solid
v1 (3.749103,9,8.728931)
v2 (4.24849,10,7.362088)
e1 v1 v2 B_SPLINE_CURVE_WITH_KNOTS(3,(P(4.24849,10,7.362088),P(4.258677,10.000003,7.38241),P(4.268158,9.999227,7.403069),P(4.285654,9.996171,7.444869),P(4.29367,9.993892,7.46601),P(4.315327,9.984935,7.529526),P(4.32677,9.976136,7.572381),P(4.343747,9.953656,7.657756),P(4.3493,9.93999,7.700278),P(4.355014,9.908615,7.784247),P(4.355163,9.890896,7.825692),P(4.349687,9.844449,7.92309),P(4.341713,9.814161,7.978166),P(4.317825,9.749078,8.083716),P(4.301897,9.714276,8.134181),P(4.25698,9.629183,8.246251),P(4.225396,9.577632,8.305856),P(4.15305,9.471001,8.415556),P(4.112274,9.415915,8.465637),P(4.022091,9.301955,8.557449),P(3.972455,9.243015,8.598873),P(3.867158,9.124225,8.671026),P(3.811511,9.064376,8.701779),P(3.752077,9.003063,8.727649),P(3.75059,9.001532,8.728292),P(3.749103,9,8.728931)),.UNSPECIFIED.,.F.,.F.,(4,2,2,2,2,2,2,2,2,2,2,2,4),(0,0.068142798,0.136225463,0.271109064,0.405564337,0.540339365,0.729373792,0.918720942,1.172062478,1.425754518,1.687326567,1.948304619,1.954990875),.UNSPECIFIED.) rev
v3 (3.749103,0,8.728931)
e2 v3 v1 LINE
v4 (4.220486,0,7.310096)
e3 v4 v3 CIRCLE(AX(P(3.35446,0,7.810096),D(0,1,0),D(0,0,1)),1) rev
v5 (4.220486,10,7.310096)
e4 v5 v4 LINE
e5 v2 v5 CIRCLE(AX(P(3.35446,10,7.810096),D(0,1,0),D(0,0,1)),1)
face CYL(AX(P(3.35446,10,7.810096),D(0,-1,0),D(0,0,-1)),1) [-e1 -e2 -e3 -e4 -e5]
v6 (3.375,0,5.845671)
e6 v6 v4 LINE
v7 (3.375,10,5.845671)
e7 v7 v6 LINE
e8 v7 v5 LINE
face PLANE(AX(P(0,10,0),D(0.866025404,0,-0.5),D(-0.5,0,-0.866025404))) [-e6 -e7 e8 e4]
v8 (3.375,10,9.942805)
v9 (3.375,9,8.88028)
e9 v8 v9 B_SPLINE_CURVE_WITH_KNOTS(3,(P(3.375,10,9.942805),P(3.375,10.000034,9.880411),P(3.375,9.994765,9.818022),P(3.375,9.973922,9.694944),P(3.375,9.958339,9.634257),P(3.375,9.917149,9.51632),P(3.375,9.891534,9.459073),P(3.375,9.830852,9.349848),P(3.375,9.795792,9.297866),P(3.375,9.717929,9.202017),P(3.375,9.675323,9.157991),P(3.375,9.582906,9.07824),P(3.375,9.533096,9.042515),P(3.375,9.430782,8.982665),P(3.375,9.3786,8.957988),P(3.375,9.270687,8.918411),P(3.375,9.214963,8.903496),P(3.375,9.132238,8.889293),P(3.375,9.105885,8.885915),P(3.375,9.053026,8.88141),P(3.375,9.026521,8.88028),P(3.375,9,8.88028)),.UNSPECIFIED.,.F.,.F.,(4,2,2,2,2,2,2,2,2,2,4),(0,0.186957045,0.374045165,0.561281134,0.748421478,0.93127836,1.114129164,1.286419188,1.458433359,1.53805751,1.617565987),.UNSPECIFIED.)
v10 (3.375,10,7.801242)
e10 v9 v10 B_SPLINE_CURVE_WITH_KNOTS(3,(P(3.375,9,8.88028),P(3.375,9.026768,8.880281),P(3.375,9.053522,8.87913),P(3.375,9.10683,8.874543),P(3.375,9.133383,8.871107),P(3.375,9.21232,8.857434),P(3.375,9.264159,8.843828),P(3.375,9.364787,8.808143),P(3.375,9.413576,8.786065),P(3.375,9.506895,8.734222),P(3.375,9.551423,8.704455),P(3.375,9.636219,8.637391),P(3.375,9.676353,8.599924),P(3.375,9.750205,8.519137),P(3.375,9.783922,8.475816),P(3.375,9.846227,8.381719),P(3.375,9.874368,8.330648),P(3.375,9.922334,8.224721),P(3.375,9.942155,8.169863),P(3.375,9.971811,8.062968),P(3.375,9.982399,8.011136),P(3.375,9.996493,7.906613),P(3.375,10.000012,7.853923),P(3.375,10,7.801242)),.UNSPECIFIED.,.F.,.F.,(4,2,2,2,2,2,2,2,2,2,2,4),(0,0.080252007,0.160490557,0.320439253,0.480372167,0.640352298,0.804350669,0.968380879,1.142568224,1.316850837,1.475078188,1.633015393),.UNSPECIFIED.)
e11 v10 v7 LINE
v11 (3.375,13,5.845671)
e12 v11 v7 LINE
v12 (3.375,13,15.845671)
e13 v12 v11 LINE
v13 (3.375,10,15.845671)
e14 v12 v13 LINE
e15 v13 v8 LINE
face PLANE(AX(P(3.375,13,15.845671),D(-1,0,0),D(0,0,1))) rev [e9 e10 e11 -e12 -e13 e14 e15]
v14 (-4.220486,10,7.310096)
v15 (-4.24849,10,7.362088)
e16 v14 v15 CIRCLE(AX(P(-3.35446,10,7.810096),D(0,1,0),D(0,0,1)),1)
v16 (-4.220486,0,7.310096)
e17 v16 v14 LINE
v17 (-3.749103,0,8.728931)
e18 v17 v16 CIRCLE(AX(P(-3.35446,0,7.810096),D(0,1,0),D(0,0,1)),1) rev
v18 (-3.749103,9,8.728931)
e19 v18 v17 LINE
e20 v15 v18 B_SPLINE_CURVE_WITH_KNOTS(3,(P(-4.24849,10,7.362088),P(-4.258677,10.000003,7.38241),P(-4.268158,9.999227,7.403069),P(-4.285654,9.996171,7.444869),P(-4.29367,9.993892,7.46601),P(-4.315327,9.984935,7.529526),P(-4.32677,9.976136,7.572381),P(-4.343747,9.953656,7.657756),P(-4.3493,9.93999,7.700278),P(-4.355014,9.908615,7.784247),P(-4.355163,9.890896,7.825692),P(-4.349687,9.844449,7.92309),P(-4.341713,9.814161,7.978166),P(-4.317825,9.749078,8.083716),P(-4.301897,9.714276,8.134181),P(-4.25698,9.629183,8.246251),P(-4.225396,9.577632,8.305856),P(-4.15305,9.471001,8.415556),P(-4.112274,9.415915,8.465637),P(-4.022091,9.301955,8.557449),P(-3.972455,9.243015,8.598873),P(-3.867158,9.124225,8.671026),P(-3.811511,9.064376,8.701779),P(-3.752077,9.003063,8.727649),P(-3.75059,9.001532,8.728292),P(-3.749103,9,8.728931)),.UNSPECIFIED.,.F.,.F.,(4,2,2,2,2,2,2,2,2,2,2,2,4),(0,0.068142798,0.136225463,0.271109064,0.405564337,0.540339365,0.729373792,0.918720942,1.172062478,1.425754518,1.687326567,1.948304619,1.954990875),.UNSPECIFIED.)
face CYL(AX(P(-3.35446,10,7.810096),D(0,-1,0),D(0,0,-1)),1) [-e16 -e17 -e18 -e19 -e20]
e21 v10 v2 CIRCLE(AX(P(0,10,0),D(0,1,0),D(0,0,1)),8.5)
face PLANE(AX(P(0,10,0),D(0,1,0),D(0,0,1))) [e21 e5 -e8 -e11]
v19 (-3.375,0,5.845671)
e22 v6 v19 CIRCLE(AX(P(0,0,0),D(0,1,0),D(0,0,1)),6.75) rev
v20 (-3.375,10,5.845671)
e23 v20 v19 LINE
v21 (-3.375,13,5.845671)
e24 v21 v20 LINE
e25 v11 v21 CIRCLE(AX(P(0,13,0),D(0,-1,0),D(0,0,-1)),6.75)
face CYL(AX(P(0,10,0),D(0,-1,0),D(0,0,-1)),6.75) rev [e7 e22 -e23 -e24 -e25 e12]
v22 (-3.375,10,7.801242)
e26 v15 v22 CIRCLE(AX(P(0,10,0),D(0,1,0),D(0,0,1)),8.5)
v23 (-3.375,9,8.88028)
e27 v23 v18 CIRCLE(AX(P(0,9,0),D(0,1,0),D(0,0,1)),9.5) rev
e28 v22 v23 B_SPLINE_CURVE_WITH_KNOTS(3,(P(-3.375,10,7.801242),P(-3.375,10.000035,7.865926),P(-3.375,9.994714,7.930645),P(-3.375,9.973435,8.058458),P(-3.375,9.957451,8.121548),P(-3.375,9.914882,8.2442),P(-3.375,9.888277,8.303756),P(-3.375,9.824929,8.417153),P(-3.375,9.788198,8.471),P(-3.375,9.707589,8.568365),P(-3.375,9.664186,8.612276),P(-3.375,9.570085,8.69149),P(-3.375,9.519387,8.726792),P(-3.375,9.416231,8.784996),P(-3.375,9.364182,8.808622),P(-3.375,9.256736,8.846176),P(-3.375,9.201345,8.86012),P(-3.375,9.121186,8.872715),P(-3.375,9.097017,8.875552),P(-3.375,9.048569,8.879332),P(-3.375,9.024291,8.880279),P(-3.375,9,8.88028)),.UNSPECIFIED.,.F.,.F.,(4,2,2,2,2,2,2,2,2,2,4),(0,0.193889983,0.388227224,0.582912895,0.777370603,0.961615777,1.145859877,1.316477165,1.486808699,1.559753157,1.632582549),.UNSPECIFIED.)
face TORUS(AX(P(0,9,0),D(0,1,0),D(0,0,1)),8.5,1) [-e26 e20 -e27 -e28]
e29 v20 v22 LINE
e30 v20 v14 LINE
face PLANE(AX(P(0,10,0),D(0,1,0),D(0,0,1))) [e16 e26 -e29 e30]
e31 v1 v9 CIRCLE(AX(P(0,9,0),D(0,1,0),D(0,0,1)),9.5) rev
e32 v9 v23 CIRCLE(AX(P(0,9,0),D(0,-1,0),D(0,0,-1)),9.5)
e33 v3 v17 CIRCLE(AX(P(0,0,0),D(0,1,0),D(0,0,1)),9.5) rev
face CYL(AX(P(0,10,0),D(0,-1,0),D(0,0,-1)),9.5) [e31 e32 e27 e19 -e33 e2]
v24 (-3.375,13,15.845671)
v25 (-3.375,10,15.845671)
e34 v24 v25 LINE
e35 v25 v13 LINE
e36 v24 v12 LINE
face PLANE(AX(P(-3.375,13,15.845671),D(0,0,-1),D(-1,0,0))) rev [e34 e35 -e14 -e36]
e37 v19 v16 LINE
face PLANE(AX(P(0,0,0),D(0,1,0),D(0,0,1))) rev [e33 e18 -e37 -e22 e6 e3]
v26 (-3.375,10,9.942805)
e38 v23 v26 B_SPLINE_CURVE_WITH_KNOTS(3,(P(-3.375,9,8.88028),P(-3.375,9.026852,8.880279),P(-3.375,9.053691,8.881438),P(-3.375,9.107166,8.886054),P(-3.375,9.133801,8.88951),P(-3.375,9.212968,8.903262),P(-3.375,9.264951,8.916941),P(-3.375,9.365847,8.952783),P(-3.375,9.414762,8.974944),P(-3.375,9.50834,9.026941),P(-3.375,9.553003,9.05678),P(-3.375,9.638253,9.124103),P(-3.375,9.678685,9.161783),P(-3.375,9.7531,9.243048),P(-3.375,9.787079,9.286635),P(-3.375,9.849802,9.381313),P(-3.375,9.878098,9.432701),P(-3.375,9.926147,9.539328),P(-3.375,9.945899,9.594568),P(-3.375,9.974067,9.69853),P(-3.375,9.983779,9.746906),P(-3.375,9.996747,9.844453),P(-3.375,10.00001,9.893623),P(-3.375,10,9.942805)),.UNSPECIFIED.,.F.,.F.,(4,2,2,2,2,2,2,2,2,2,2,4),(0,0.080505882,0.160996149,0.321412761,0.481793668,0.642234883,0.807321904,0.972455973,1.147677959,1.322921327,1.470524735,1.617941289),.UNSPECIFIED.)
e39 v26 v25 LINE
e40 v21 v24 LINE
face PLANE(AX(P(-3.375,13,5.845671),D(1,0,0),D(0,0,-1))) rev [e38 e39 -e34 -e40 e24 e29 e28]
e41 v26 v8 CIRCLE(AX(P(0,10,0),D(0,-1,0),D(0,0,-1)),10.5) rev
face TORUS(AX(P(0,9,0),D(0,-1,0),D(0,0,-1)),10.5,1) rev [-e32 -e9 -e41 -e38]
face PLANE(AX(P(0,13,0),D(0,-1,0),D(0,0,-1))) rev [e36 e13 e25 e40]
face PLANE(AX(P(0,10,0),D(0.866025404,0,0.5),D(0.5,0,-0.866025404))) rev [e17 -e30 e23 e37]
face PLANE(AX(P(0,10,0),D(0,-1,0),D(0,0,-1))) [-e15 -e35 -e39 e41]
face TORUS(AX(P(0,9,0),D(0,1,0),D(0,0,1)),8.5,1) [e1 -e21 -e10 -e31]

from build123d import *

# Parameters (mm, degrees)
BOSS_EXTRUDE1_DEPTH = 10
BOSS_EXTRUDE2_DEPTH = 3
FILLET1_R           = 1
FILLET2_R           = 1
FILLET3_R           = 1
FILLET4_R           = 1


with BuildPart() as part:
    # Sketch1 → Boss-Extrude1 (new body)
    with BuildSketch(Plane(origin=(0, 0, 0), x_dir=(1, 0, 0), z_dir=(0, 1, 0))):
        with BuildLine():
            ThreePointArc((4.75, -8.227241336), (0, -9.5), (-4.75, -8.227241336))
            Line((-4.75, -8.227241336), (-3.375, -5.845671476))
            ThreePointArc((-3.375, -5.845671476), (0, -6.75), (3.375, -5.845671476))
            Line((3.375, -5.845671476), (4.75, -8.227241336))
        make_face()
    extrude(amount=BOSS_EXTRUDE1_DEPTH)

    # Sketch2 → Boss-Extrude2 (add)
    with BuildSketch(Plane(origin=(0, 10, 0), x_dir=(1, 0, 0), z_dir=(0, 1, 0))):
        with BuildLine():
            Line((-3.375, -5.845671476), (-3.375, -15.845671476))
            Line((-3.375, -15.845671476), (3.375, -15.845671476))
            Line((3.375, -15.845671476), (3.375, -5.845671476))
            ThreePointArc((3.375, -5.845671476), (0, -6.75), (-3.375, -5.845671476))
        make_face()
    extrude(amount=BOSS_EXTRUDE2_DEPTH)

    # Fillet1
    fillet1_edges = [part.edges().sort_by_distance(p)[0] for p in [
        (0, 10, 9.5),
    ]]
    fillet(fillet1_edges, radius=FILLET1_R)

    # Fillet2
    fillet2_edges = [part.edges().sort_by_distance(p)[0] for p in [
        (-4.075600712, 10, 8.581344815),
    ]]
    fillet(fillet2_edges, radius=FILLET2_R)

    # Fillet3
    # the kernel refuses this fillet: 1 mm, written as the material it takes off along each edge
    with BuildSketch(Plane(origin=(-4.75, -2.798981274, 8.227241336), x_dir=(0.893983522608317, 0, 0.44809983408256804), z_dir=(0, 1, 0))) as fillet3_piece_1:
        with BuildLine():
            CenterArc((1.060666588, 0.998262358), FILLET3_R, 176.621836485, 96.756327031)
            Line((0.06240423, 1.05718828), (0, 0))
            ThreePointArc((0, 0), (0.559796255, -0.016507597), (1.11959251, 0))
        make_face()
    extrude(amount=14.597962548, mode=Mode.SUBTRACT)
    with BuildSketch(Plane(origin=(0, 10, 0), x_dir=(0.7080675160533174, 0, 0.706144739207257), z_dir=(0.706144739207257, 0, -0.7080675160533174))) as fillet3_piece_2_section:
        with BuildLine():
            CenterArc((9.5 - FILLET3_R, FILLET3_R), FILLET3_R, 270, 90)
            Line((9.5 - FILLET3_R, 0), (9.5, 0))
            Line((9.5, 0), (9.5, FILLET3_R))
        make_face()
    fillet3_piece_2 = revolve(axis=Axis((0, 10, 0), (0, -1, 0)), revolution_arc=39.346226133, mode=Mode.PRIVATE)
    fillet3_piece_2 = split(fillet3_piece_2, bisect_by=Plane(origin=(3.375, 9.768637129, 8.366507066), z_dir=(1, 0, 0)), keep=Keep.TOP, mode=Mode.PRIVATE)
    add(fillet3_piece_2, mode=Mode.SUBTRACT)

    # Fillet4
    # the kernel refuses this fillet: 1 mm, written as the material it takes off along each edge
    with BuildSketch(Plane(origin=(4.75, -2.798981274, 8.227241336), x_dir=(-0.8939835226083171, 0, 0.44809983408256765), z_dir=(0, 1, 0))) as fillet4_piece_1:
        with BuildLine():
            CenterArc((1.060666588, -0.998262358), FILLET4_R, 86.621836485, 96.756327031)
            Line((0.06240423, -1.05718828), (0, 0))
            ThreePointArc((0, 0), (0.559796255, 0.016507597), (1.11959251, 0))
        make_face()
    extrude(amount=14.597962548, mode=Mode.SUBTRACT)


solid = part.part
